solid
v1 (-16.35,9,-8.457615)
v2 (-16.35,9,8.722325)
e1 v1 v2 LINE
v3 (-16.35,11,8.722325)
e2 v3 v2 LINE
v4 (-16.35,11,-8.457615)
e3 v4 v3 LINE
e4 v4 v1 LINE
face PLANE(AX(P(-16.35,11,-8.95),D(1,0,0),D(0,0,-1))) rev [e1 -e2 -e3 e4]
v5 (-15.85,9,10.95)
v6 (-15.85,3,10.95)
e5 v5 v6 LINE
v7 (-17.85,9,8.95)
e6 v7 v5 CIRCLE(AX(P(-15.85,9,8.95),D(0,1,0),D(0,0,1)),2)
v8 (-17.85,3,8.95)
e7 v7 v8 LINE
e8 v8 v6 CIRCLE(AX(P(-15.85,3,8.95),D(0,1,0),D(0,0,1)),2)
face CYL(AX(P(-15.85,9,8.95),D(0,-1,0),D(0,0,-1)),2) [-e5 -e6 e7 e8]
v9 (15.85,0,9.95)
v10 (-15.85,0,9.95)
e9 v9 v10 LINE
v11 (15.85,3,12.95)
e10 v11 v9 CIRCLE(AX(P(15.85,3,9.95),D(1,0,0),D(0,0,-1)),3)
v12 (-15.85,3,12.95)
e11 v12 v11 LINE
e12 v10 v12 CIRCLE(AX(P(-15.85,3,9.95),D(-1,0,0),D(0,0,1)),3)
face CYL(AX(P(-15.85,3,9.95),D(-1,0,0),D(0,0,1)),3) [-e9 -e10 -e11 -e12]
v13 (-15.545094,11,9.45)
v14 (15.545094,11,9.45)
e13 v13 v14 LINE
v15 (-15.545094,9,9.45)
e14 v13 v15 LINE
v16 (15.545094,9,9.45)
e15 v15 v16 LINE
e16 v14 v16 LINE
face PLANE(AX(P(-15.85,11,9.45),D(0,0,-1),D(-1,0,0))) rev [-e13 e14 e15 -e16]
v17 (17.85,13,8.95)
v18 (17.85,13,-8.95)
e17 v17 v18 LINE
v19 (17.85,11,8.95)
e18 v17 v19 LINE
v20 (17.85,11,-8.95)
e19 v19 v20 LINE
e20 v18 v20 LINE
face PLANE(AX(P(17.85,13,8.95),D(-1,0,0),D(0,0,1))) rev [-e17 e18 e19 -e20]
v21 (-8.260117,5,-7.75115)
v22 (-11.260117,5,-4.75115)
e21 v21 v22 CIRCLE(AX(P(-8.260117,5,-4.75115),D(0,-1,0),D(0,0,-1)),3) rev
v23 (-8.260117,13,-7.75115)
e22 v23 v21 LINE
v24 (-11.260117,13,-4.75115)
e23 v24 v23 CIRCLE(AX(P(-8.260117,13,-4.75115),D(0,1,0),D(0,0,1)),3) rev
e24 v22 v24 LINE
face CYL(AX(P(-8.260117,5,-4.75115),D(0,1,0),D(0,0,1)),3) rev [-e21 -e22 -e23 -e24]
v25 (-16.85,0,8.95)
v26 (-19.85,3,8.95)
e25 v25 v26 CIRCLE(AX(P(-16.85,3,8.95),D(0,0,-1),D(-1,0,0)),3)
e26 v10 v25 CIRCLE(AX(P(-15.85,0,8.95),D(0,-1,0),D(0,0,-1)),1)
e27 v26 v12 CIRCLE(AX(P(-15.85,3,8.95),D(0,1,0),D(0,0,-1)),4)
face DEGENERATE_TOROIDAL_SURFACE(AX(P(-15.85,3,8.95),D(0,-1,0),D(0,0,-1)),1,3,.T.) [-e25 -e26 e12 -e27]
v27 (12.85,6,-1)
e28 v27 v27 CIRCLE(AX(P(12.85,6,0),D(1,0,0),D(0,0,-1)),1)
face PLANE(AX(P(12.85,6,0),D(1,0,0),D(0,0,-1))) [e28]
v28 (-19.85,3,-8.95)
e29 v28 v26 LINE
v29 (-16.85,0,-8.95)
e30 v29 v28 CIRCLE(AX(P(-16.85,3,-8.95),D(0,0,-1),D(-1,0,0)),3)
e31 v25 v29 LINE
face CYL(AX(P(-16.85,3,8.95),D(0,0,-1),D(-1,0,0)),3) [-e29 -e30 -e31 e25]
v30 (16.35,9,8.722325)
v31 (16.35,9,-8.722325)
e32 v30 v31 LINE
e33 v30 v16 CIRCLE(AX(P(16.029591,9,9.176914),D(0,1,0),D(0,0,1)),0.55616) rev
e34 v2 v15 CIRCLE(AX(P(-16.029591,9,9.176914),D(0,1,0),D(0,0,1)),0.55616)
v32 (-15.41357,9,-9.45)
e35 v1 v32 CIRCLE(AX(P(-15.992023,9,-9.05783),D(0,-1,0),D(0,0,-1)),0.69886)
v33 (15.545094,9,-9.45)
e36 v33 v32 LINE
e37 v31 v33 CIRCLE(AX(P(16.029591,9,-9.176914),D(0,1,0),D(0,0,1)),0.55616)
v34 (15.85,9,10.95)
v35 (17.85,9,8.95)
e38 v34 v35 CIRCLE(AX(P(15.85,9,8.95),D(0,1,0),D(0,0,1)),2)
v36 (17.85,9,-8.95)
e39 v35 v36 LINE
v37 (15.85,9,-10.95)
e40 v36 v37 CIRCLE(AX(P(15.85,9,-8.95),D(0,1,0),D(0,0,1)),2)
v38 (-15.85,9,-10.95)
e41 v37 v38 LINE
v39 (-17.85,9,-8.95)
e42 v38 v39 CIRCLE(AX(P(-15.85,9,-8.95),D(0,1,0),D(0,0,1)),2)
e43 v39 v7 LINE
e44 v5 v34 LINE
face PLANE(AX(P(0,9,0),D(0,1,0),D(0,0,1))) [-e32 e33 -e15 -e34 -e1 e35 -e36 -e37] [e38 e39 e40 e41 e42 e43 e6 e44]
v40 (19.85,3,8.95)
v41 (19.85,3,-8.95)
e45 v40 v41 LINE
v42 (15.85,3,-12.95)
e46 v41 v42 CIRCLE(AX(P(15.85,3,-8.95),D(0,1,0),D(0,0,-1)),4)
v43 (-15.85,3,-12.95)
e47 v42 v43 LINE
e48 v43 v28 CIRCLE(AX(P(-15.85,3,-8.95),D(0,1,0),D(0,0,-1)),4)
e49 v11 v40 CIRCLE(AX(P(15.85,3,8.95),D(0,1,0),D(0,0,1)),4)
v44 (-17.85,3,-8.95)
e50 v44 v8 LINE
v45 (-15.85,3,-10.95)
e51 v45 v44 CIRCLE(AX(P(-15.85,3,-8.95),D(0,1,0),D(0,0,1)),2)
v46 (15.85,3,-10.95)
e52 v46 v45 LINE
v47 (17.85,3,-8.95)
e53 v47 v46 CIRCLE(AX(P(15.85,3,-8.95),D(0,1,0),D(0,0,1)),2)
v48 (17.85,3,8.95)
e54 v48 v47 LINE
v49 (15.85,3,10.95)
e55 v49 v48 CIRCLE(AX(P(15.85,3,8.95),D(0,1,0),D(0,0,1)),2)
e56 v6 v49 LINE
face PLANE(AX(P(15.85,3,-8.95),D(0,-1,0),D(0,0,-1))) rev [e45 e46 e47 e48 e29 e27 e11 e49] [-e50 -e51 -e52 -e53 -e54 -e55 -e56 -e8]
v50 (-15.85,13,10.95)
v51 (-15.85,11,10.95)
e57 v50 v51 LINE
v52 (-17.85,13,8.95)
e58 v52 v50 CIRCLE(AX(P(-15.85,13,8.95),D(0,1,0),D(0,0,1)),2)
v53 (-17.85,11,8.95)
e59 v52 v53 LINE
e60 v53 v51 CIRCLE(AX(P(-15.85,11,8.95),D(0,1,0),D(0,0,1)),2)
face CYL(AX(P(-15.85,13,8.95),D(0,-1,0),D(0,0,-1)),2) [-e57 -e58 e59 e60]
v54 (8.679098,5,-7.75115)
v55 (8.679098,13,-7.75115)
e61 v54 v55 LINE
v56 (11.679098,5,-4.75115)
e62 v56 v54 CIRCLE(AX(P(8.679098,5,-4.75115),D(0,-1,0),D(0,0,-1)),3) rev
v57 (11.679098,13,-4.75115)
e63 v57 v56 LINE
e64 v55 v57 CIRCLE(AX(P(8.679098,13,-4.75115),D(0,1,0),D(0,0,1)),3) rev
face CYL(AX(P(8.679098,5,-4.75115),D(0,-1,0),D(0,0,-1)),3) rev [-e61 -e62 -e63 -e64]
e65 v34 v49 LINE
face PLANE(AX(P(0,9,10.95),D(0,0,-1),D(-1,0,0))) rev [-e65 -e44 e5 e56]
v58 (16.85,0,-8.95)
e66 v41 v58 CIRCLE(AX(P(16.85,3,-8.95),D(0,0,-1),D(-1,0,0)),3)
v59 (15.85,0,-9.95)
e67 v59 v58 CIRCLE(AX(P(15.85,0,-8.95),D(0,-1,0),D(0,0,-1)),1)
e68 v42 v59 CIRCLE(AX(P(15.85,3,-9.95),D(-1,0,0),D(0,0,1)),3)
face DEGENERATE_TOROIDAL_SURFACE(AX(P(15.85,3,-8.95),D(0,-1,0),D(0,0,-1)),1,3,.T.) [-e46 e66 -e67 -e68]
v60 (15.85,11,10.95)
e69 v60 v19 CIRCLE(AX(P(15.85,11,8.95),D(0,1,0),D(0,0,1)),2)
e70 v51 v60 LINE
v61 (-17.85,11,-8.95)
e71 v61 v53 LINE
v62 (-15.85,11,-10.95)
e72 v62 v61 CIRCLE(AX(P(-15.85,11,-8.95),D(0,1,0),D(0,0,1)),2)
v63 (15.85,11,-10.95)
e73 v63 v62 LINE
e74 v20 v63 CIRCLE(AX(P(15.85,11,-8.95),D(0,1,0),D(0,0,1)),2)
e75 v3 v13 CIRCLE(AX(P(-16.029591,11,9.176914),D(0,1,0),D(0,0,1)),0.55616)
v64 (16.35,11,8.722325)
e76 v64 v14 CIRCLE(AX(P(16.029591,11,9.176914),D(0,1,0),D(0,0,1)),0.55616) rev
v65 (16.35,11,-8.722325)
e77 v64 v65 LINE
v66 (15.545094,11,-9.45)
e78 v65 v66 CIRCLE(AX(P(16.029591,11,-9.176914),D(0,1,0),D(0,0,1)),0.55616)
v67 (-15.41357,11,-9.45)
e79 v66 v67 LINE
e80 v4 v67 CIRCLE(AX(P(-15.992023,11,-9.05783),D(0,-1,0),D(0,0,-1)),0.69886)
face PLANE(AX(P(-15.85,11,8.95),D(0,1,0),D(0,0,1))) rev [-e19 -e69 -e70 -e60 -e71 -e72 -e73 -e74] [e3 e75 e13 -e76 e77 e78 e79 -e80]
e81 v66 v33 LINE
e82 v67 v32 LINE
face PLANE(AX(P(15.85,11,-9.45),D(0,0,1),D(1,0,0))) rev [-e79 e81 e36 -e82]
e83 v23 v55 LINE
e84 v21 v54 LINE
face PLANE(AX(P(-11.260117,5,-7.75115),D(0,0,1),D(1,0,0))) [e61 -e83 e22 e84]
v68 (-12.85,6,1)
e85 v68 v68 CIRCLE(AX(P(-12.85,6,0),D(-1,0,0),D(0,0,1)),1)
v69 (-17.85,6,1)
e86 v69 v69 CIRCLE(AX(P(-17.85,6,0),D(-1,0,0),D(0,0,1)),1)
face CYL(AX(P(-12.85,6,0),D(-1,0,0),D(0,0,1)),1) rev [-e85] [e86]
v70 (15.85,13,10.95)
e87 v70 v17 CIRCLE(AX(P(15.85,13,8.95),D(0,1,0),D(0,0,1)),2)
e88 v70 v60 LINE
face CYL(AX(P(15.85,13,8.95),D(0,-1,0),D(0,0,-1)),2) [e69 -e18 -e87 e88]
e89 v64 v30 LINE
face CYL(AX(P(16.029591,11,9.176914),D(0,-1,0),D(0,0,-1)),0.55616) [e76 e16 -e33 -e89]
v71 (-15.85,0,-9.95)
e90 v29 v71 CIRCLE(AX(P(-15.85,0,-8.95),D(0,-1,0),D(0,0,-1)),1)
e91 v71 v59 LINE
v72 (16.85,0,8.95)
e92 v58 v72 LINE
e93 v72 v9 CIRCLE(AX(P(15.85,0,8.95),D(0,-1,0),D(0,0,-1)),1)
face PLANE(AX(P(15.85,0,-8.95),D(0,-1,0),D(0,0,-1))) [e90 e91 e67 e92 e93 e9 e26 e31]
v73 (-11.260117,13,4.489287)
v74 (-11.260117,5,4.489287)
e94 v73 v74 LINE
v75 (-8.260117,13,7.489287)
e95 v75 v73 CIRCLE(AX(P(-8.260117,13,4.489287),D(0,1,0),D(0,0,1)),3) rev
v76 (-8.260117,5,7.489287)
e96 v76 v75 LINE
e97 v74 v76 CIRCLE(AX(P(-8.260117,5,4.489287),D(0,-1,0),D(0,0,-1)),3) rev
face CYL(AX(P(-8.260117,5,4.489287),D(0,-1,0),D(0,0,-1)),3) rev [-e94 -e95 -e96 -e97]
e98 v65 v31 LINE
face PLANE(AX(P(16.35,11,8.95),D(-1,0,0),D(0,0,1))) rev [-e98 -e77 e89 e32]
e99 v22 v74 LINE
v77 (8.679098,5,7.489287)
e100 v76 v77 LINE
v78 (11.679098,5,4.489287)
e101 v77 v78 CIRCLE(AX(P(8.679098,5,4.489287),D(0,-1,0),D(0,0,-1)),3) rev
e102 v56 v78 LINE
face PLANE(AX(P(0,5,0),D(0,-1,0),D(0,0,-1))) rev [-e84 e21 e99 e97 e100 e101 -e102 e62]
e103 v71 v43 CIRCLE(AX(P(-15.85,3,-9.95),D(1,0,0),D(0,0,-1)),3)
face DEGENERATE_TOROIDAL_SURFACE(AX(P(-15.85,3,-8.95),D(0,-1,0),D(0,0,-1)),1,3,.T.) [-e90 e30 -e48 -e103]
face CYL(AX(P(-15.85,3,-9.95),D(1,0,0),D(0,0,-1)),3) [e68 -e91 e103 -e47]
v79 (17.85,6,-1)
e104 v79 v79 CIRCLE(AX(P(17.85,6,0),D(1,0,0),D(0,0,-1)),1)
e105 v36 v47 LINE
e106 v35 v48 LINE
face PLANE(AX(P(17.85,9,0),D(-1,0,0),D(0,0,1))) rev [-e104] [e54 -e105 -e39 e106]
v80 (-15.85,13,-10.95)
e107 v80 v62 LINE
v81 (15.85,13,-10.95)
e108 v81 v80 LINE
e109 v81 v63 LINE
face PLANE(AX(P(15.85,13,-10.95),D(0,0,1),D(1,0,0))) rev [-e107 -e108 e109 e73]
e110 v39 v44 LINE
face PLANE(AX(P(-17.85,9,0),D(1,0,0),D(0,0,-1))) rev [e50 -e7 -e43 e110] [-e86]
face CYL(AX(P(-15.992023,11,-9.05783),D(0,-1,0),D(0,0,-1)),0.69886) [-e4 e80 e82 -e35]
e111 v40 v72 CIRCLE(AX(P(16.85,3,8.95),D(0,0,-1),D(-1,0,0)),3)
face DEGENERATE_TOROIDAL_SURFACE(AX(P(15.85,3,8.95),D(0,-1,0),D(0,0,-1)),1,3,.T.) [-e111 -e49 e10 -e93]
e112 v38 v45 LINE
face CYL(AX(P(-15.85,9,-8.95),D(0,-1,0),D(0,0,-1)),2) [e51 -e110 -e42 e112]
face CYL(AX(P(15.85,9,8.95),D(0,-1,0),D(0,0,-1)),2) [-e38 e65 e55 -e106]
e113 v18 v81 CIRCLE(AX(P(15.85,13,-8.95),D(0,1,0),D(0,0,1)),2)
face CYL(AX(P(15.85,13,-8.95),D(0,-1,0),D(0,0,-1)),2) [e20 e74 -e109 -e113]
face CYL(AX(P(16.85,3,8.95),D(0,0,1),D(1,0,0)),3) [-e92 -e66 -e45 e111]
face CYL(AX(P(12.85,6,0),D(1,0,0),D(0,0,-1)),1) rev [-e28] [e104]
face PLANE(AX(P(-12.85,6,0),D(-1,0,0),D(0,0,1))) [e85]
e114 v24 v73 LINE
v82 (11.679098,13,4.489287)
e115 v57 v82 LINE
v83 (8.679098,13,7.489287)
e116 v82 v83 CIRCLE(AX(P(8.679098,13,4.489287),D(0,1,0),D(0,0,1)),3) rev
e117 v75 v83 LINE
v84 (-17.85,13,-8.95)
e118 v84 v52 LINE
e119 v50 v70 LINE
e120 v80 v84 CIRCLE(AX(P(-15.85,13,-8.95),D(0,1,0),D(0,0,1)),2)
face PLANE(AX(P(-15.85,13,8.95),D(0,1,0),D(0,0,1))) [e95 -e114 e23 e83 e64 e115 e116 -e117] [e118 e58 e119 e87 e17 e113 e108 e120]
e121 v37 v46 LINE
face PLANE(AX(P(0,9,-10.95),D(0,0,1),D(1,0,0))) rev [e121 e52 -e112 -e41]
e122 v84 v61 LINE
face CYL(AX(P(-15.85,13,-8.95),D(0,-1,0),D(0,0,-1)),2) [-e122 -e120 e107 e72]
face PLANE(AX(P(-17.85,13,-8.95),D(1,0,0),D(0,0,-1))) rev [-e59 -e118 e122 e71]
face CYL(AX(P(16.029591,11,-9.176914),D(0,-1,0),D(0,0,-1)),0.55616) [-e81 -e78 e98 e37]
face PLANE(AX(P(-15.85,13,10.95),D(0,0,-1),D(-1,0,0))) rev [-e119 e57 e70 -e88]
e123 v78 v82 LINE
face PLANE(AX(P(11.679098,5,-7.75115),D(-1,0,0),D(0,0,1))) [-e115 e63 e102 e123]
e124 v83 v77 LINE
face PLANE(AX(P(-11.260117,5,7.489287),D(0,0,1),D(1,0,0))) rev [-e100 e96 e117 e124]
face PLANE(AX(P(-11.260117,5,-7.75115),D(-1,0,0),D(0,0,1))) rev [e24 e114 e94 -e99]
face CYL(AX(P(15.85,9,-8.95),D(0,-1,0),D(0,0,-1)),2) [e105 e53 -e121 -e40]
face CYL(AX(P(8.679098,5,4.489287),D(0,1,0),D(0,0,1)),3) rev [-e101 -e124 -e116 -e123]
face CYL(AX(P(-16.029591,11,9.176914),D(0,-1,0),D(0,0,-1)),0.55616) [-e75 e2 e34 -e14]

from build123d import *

# Parameters (mm, degrees)
SALIENTE_EXTRUIR1_DEPTH  = 3
SALIENTE_EXTRUIR3_DEPTH  = 6
SALIENTE_EXTRUIR4_DEPTH  = 2
SALIENTE_EXTRUIR5_DEPTH  = 2
REDONDEO1_R              = 3
CROQUIS5_R               = 1
CORTAR_EXTRUIR1_DEPTH    = 5
CORTAR_EXTRUIR2_START    = -5
CROQUIS6_R               = 1
CORTAR_EXTRUIR2_DEPTH    = 5
SALIENTE_EXTRUIR6_START  = -5
SALIENTE_EXTRUIR6_DEPTH  = 5
CROQUIS9_W               = 22.939215458
CROQUIS9_H               = 15.240437668
CORTAR_EXTRUIR3_DEPTH    = 8
REDONDEO2_R              = 3
SALIENTE_EXTRUIR13_DEPTH = 2
SALIENTE_EXTRUIR15_DEPTH = 2


with BuildPart() as part:
    # Croquis1 → Saliente-Extruir1 (new body)
    with BuildSketch(Plane(origin=(0, 0, 0), x_dir=(1, 0, 0), z_dir=(0, 1, 0))):
        with BuildLine():
            Line((-15.85, -12.95), (15.85, -12.95))
            ThreePointArc((15.85, -12.95), (18.678427125, -11.778427125), (19.85, -8.95))
            Line((19.85, -8.95), (19.85, 8.95))
            ThreePointArc((19.85, 8.95), (18.678427125, 11.778427125), (15.85, 12.95))
            Line((15.85, 12.95), (-15.85, 12.95))
            ThreePointArc((-15.85, 12.95), (-18.678427125, 11.778427125), (-19.85, 8.95))
            Line((-19.85, 8.95), (-19.85, -8.95))
            ThreePointArc((-19.85, -8.95), (-18.678427125, -11.778427125), (-15.85, -12.95))
        make_face()
    extrude(amount=SALIENTE_EXTRUIR1_DEPTH)

    # Croquis2 → Saliente-Extruir3 (add)
    with BuildSketch(Plane(origin=(0, 3, 0), x_dir=(1, 0, 0), z_dir=(0, 1, 0))):
        with BuildLine():
            Line((-15.85, -10.95), (15.85, -10.95))
            ThreePointArc((15.85, -10.95), (17.264213562, -10.364213562), (17.85, -8.95))
            Line((17.85, -8.95), (17.85, 8.95))
            ThreePointArc((17.85, 8.95), (17.264213562, 10.364213562), (15.85, 10.95))
            Line((15.85, 10.95), (-15.85, 10.95))
            ThreePointArc((-15.85, 10.95), (-17.264213562, 10.364213562), (-17.85, 8.95))
            Line((-17.85, 8.95), (-17.85, -8.95))
            ThreePointArc((-17.85, -8.95), (-17.264213562, -10.364213562), (-15.85, -10.95))
        make_face()
    extrude(amount=SALIENTE_EXTRUIR3_DEPTH)

    # Croquis3 → Saliente-Extruir4 (add)
    with BuildSketch(Plane(origin=(0, 9, 0), x_dir=(1, 0, 0), z_dir=(0, 1, 0))):
        with BuildLine():
            Line((-15.85, -9.45), (15.85, -9.45))
            ThreePointArc((15.85, -9.45), (16.203553391, -9.303553391), (16.35, -8.95))
            Line((16.35, -8.95), (16.35, 8.95))
            ThreePointArc((16.35, 8.95), (16.203553391, 9.303553391), (15.85, 9.45))
            Line((15.85, 9.45), (-15.85, 9.45))
            ThreePointArc((-15.85, 9.45), (-16.203553391, 9.303553391), (-16.35, 8.95))
            Line((-16.35, 8.95), (-16.35, -8.95))
            ThreePointArc((-16.35, -8.95), (-16.203553391, -9.303553391), (-15.85, -9.45))
        make_face()
    extrude(amount=SALIENTE_EXTRUIR4_DEPTH)

    # Croquis4 → Saliente-Extruir5 (add)
    with BuildSketch(Plane(origin=(0, 11, 0), x_dir=(1, 0, 0), z_dir=(0, 1, 0))):
        with BuildLine():
            Line((-15.85, -10.95), (15.85, -10.95))
            ThreePointArc((15.85, -10.95), (17.264213562, -10.364213562), (17.85, -8.95))
            Line((17.85, -8.95), (17.85, 8.95))
            ThreePointArc((17.85, 8.95), (17.264213562, 10.364213562), (15.85, 10.95))
            Line((15.85, 10.95), (-15.85, 10.95))
            ThreePointArc((-15.85, 10.95), (-17.264213562, 10.364213562), (-17.85, 8.95))
            Line((-17.85, 8.95), (-17.85, -8.95))
            ThreePointArc((-17.85, -8.95), (-17.264213562, -10.364213562), (-15.85, -10.95))
        make_face()
    extrude(amount=SALIENTE_EXTRUIR5_DEPTH)

    # Redondeo1
    redondeo1_edges = [part.edges().sort_by_distance(p)[0] for p in [
        (0, 0, -12.95),
        (-18.678427125, 0, -11.778427125),
        (-19.85, 0, 0),
        (-18.678427125, 0, 11.778427125),
        (0, 0, 12.95),
        (18.678427125, 0, 11.778427125),
        (19.85, 0, 0),
        (18.678427125, 0, -11.778427125),
    ]]
    fillet(redondeo1_edges, radius=REDONDEO1_R - 0.0001)  # a hair under: the kernel refuses the full size

    # Croquis5 → Cortar-Extruir1 (cut)
    with BuildSketch(Plane.ZY.offset(17.85)):
        with Locations((0, 6)):
            Circle(CROQUIS5_R)
    extrude(amount=-CORTAR_EXTRUIR1_DEPTH, mode=Mode.SUBTRACT)

    # Croquis6 → Cortar-Extruir2 (cut)
    with BuildSketch(Plane(origin=(17.85, 0, 0), x_dir=(0, 0, -1), z_dir=(1, 0, 0)).offset(CORTAR_EXTRUIR2_START)):
        with Locations(Location((0, 6, 0), (0, 0, 180))):
            Circle(CROQUIS6_R)
    extrude(amount=CORTAR_EXTRUIR2_DEPTH, mode=Mode.SUBTRACT)

    # Croquis8 → Saliente-Extruir6 (add)
    with BuildSketch(Plane(origin=(0, 13, 0), x_dir=(1, 0, 0), z_dir=(0, 1, 0)).offset(SALIENTE_EXTRUIR6_START)):
        with BuildLine():
            ThreePointArc((16.35, 8.95), (16.287739315, 9.387739315), (15.85, 9.45))
            ThreePointArc((15.85, 9.45), (16.203553391, 9.303553391), (16.35, 8.95))
        make_face()
        with BuildLine():
            ThreePointArc((15.85, -9.45), (16.203553391, -9.303553391), (16.35, -8.95))
            ThreePointArc((16.35, -8.95), (16.287739315, -9.387739315), (15.85, -9.45))
        make_face()
        with BuildLine():
            ThreePointArc((-16.35, -8.95), (-16.203553391, -9.303553391), (-15.85, -9.45))
            ThreePointArc((-15.85, -9.45), (-16.287739315, -9.387739315), (-16.35, -8.95))
        make_face()
        with BuildLine():
            ThreePointArc((-16.35, 8.95), (-16.287739315, 9.387739315), (-15.85, 9.45))
            ThreePointArc((-15.85, 9.45), (-16.203553391, 9.303553391), (-16.35, 8.95))
        make_face()
    extrude(amount=SALIENTE_EXTRUIR6_DEPTH)

    # Croquis9 → Cortar-Extruir3 (cut)
    with BuildSketch(Plane(origin=(0, 13, 0), x_dir=(1, 0, 0), z_dir=(0, 1, 0))):
        with Locations((0.209490552, 0.130931595)):
            Rectangle(CROQUIS9_W, CROQUIS9_H)
    extrude(amount=-CORTAR_EXTRUIR3_DEPTH, mode=Mode.SUBTRACT)

    # Redondeo2
    redondeo2_edges = [part.edges().sort_by_distance(p)[0] for p in [
        (11.679098281, 9, 7.489287239),
        (-11.260117177, 9, 7.489287239),
        (-11.260117177, 9, -7.751150429),
        (11.679098281, 9, -7.751150429),
    ]]
    fillet(redondeo2_edges, radius=REDONDEO2_R)

    # Croquis11 → Saliente-Extruir13 (add)
    with BuildSketch(Plane(origin=(0, 9, 0), x_dir=(1, 0, 0), z_dir=(0, 1, 0))):
        with BuildLine():
            Line((-16.35, -8.95), (-16.35, -8.722324592))
            ThreePointArc((-16.35, -8.722324592), (-16.402564717, -9.58947242), (-15.545094105, -9.45))
            Line((-15.545094105, -9.45), (-15.85, -9.45))
            ThreePointArc((-15.85, -9.45), (-16.287739315, -9.387739315), (-16.35, -8.95))
        make_face()
        with BuildLine():
            ThreePointArc((16.35, 8.722324592), (16.402564717, 9.58947242), (15.545094105, 9.45))
            Line((15.545094105, 9.45), (15.85, 9.45))
            ThreePointArc((15.85, 9.45), (16.287739315, 9.387739315), (16.35, 8.95))
            Line((16.35, 8.95), (16.35, 8.722324592))
        make_face()
        with BuildLine():
            Line((15.85, -9.45), (15.545094105, -9.45))
            ThreePointArc((15.545094105, -9.45), (16.402564717, -9.58947242), (16.35, -8.722324592))
            Line((16.35, -8.722324592), (16.35, -8.95))
            ThreePointArc((16.35, -8.95), (16.287739315, -9.387739315), (15.85, -9.45))
        make_face()
    extrude(amount=SALIENTE_EXTRUIR13_DEPTH)

    # Croquis13 → Saliente-Extruir15 (add)
    with BuildSketch(Plane(origin=(0, 9, 0), x_dir=(1, 0, 0), z_dir=(0, 1, 0))):
        with BuildLine():
            Line((-16.35, 8.95), (-16.35, 8.457615485))
            ThreePointArc((-16.35, 8.457615485), (-16.500312948, 9.537460741), (-15.413569935, 9.45))
            Line((-15.413569935, 9.45), (-15.85, 9.45))
            ThreePointArc((-15.85, 9.45), (-16.287739315, 9.387739315), (-16.35, 8.95))
        make_face()
    extrude(amount=SALIENTE_EXTRUIR15_DEPTH)


solid = part.part
